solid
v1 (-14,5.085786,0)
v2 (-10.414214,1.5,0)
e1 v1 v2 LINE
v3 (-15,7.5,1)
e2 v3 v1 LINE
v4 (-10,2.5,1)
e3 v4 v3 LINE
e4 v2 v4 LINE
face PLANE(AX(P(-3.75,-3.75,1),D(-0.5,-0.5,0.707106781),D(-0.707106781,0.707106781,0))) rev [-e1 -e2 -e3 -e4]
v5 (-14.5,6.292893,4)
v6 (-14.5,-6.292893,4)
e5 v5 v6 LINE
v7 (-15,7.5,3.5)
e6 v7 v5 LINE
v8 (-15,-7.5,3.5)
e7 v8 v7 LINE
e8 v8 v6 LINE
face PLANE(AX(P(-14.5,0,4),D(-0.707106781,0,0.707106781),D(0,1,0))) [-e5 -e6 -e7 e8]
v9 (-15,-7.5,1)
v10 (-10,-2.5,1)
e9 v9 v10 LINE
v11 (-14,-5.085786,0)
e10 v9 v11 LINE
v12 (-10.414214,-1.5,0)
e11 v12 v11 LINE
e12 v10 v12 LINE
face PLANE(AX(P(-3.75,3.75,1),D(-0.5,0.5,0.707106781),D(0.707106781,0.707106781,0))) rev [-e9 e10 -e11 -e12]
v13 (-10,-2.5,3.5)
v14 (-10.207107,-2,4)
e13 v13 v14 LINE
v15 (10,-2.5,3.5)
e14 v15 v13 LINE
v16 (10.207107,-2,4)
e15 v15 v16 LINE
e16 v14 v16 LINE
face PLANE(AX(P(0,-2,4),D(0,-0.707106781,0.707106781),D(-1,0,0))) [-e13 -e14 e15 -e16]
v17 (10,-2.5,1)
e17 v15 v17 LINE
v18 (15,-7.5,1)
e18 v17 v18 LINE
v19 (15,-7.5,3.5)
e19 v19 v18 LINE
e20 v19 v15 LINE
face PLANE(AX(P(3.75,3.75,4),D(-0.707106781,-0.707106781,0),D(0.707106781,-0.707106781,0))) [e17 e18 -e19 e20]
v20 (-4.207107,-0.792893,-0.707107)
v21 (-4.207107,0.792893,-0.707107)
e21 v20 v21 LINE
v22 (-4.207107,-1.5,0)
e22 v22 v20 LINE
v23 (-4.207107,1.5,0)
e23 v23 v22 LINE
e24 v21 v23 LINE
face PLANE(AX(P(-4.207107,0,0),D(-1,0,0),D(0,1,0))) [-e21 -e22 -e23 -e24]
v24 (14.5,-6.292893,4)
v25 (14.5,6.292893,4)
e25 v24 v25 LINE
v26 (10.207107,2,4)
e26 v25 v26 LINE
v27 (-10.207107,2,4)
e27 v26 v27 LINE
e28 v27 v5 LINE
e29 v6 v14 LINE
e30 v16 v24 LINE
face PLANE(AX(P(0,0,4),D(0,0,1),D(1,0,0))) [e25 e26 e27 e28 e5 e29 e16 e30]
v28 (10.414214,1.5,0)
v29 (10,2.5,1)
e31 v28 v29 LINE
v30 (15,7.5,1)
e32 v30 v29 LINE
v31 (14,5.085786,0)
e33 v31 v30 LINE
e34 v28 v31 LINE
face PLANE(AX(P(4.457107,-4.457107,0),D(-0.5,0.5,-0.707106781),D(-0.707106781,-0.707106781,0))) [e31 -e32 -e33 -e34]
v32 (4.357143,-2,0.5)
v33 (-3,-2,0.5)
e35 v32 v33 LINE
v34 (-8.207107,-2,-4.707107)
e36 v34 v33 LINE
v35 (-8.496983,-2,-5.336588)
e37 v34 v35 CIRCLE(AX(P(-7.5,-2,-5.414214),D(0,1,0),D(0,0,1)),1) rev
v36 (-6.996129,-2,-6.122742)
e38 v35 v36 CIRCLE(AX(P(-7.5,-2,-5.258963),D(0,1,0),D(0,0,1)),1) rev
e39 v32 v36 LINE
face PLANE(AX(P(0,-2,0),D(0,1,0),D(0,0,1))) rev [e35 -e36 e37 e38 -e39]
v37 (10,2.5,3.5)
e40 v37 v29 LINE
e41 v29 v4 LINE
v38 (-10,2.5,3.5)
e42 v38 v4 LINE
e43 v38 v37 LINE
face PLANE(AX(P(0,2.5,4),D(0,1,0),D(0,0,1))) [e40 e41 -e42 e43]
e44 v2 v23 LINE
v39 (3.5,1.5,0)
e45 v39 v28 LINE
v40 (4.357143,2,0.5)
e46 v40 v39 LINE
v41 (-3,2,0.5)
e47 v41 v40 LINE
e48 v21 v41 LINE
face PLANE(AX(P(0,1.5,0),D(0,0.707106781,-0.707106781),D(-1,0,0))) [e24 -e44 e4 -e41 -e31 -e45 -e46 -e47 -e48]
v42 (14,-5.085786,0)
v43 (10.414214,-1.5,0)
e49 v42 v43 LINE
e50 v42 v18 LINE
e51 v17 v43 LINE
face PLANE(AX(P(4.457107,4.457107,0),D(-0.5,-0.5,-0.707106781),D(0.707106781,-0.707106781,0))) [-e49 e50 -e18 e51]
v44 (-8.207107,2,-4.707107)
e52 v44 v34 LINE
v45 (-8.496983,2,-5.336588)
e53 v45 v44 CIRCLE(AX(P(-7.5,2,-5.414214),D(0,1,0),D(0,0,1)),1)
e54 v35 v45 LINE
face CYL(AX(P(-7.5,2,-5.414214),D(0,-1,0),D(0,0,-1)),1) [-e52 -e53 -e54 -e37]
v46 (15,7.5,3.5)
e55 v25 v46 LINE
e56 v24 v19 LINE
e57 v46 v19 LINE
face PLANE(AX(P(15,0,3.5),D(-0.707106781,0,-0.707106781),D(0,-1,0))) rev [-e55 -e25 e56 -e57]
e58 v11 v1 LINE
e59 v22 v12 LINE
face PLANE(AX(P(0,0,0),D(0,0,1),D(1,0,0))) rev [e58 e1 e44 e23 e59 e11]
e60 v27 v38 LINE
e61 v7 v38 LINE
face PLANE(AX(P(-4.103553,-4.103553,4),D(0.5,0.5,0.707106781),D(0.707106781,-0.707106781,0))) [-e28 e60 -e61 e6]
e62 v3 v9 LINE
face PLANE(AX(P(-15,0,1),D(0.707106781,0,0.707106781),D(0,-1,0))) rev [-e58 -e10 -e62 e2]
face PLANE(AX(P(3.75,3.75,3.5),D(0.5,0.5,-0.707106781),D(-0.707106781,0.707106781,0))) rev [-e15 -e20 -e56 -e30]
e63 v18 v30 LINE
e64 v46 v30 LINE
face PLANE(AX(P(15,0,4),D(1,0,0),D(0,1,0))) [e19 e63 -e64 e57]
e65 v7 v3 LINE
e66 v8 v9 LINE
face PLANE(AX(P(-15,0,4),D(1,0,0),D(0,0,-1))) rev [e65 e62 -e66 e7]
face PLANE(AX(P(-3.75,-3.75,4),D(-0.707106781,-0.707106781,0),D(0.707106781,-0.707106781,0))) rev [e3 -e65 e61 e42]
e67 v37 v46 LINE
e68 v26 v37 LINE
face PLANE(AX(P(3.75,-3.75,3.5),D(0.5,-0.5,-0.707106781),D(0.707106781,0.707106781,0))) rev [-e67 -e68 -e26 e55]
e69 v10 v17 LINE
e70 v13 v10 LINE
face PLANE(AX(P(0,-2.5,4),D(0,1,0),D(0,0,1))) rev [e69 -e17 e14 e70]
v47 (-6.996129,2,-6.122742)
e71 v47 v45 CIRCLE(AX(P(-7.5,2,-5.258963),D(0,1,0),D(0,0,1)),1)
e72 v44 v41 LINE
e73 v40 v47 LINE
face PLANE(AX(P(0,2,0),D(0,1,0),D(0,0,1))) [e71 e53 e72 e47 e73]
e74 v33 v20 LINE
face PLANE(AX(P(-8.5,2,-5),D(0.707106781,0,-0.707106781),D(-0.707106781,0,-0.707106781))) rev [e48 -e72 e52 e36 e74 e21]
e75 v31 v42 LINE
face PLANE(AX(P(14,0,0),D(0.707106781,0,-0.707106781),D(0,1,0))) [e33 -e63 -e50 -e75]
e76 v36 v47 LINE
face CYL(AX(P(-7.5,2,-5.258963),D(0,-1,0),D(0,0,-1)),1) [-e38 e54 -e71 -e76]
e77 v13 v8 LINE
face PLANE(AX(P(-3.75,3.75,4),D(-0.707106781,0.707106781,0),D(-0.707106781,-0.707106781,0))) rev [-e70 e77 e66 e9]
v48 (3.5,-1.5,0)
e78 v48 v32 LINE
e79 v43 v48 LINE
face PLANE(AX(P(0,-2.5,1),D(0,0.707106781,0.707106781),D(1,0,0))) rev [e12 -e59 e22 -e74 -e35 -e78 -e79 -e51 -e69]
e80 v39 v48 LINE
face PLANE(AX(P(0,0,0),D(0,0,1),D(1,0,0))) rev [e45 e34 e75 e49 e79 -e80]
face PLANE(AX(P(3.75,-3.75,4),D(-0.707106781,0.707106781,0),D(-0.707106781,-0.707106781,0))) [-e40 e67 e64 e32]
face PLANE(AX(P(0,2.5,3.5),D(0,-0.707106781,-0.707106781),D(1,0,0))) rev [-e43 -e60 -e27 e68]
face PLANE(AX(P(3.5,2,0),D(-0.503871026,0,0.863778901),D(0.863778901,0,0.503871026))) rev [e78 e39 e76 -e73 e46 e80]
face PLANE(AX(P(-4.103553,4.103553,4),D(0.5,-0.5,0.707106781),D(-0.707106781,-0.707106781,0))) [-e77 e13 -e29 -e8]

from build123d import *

# Parameters (mm, degrees)
SKETCH1_W           = 20
SKETCH1_H           = 5
BOSS_EXTRUDE1_DEPTH = 4
BOSS_EXTRUDE2_DEPTH = 2
CHAMFER1_SIZE       = 0.5
CHAMFER2_SIZE       = 1
CHAMFER3_SIZE       = 1
CHAMFER3_SIZE2      = 0.707106781
FILLET5_R           = 1


with BuildPart() as part:
    # Sketch1 → Boss-Extrude1 (new body)
    with BuildSketch(Plane.XY):
        Polygon((-15, 7.5), (-15, -7.5), (-10, -2.5), (-10, 2.5), align=None)
        Rectangle(SKETCH1_W, SKETCH1_H)
        Polygon((10, 2.5), (15, 7.5), (15, -7.5), (10, -2.5), align=None)
    extrude(amount=BOSS_EXTRUDE1_DEPTH)

    # Sketch4 → Boss-Extrude2 (add, symmetric)
    with BuildSketch(Plane(origin=(0, 0, 0), x_dir=(1, 0, 0), z_dir=(0, 1, 0))):
        Polygon((3.5, 0), (-8.5, 7), (-8.5, 5), (-3.5, 0), align=None)
    extrude(amount=BOSS_EXTRUDE2_DEPTH, both=True)

    # Chamfer1
    chamfer1_edges = [part.edges().sort_by_distance(p)[0] for p in [
        (-12.5, -5, 4),
        (0, -2.5, 4),
        (12.5, -5, 4),
        (15, 0, 4),
        (12.5, 5, 4),
        (0, 2.5, 4),
        (-12.5, 5, 4),
        (-15, 0, 4),
    ]]
    chamfer(chamfer1_edges, length=CHAMFER1_SIZE)

    # Chamfer2
    # the kernel refuses this chamfer: 1 mm, written as the material it takes off along each edge
    with BuildSketch(Plane(origin=(16.81845448, -9.31845448, 0), x_dir=(0.7071067811865414, 0.7071067811865538, 0), z_dir=(-0.7071067811865538, 0.7071067811865415, 0))) as chamfer2_piece_1_section:
        Polygon((CHAMFER2_SIZE, 0), (0, -CHAMFER2_SIZE), (0, 0), align=None)
    chamfer2_piece_1 = extrude(amount=12.214433788, mode=Mode.PRIVATE)
    chamfer2_piece_1 = split(chamfer2_piece_1, bisect_by=Plane(origin=(16.81845448, -5.40922724, 3.90922724), z_dir=(0, -0.7071067811865476, -0.7071067811865476)), keep=Keep.TOP, mode=Mode.PRIVATE)
    add(chamfer2_piece_1, mode=Mode.SUBTRACT)
    with BuildSketch(Plane(origin=(15, 10.071682988, 0), x_dir=(-1, 0, 0), z_dir=(0, -1, 0)), Plane(origin=(-15, 10.071682988, 0), x_dir=(0, 0, 1), z_dir=(0, -1, 0))) as chamfer2_piece_2:
        Polygon((CHAMFER2_SIZE, 0), (0, -CHAMFER2_SIZE), (0, 0), align=None)
    extrude(amount=20.143365976, mode=Mode.SUBTRACT)
    with BuildSketch(Plane(origin=(8.18154552, 0.68154552, 0), x_dir=(0.707106781186537, -0.7071067811865581, 0), z_dir=(0.7071067811865581, 0.707106781186537, 0))) as chamfer2_piece_3_section:
        Polygon((CHAMFER2_SIZE, 0), (0, -CHAMFER2_SIZE), (0, 0), align=None)
    chamfer2_piece_3 = extrude(amount=12.214433788, mode=Mode.PRIVATE)
    chamfer2_piece_3 = split(chamfer2_piece_3, bisect_by=Plane(origin=(8.18154552, 1.09077276, -0.40922724), z_dir=(0, 0.7071067811865476, -0.7071067811865476)), keep=Keep.TOP, mode=Mode.PRIVATE)
    add(chamfer2_piece_3, mode=Mode.SUBTRACT)
    with BuildSketch(Plane(origin=(12.571682988, 2.5, 0), x_dir=(0, -1, 0), z_dir=(-1, 0, 0))) as chamfer2_piece_4_section:
        Polygon((CHAMFER2_SIZE, 0), (0, CHAMFER2_SIZE), (0, 0), align=None)
    chamfer2_piece_4 = extrude(amount=25.143365976, mode=Mode.PRIVATE)
    chamfer2_piece_4 = split(chamfer2_piece_4, bisect_by=Plane(origin=(10.268509587, 2.5, 3.948297259), z_dir=(0.5038710255240867, 0, -0.8637789008984332)), keep=Keep.TOP, mode=Mode.PRIVATE)
    chamfer2_piece_4 = split(chamfer2_piece_4, bisect_by=Plane(origin=(12.282315632, 2.789367356, -0.40922724), z_dir=(-0.4999999999999927, 0.5000000000000075, -0.7071067811865475)), keep=Keep.TOP, mode=Mode.PRIVATE)
    add(chamfer2_piece_4, mode=Mode.SUBTRACT)
    with BuildSketch(Plane(origin=(12.571682988, 2.5, 0), x_dir=(0, -1, 0), z_dir=(-1, 0, 0))) as chamfer2_piece_5_section:
        Polygon((CHAMFER2_SIZE, 0), (0, CHAMFER2_SIZE), (0, 0), align=None)
    chamfer2_piece_5 = extrude(amount=25.143365976, mode=Mode.PRIVATE)
    chamfer2_piece_5 = split(chamfer2_piece_5, bisect_by=Plane(origin=(12.571682988, 2, 0), z_dir=(0, 1, 0)), keep=Keep.TOP, mode=Mode.PRIVATE)
    chamfer2_piece_5 = split(chamfer2_piece_5, bisect_by=Plane(origin=(12.282315632, 2.789367356, -0.40922724), z_dir=(-0.4999999999999927, 0.5000000000000075, -0.7071067811865475)), keep=Keep.TOP, mode=Mode.PRIVATE)
    chamfer2_piece_5 = split(chamfer2_piece_5, bisect_by=Plane(origin=(6.57520885, -3.496474138, 8.480295052), z_dir=(0.49999999999999395, 0.500000000000006, -0.7071067811865475)), keep=Keep.TOP, mode=Mode.PRIVATE)
    add(chamfer2_piece_5, mode=Mode.SUBTRACT)
    with BuildSketch(Plane(origin=(12.571682988, 2.5, 0), x_dir=(0, -1, 0), z_dir=(-1, 0, 0))) as chamfer2_piece_6_section:
        Polygon((CHAMFER2_SIZE, 0), (0, CHAMFER2_SIZE), (0, 0), align=None)
    chamfer2_piece_6 = extrude(amount=25.143365976, mode=Mode.PRIVATE)
    chamfer2_piece_6 = split(chamfer2_piece_6, bisect_by=Plane(origin=(4.535841494, 2.5, 8.035841494), z_dir=(-0.7071067811865487, 0, 0.7071067811865464)), keep=Keep.TOP, mode=Mode.PRIVATE)
    chamfer2_piece_6 = split(chamfer2_piece_6, bisect_by=Plane(origin=(6.57520885, -3.496474138, 8.480295052), z_dir=(0.49999999999999395, 0.500000000000006, -0.7071067811865475)), keep=Keep.TOP, mode=Mode.PRIVATE)
    add(chamfer2_piece_6, mode=Mode.SUBTRACT)
    with BuildSketch(Plane(origin=(-12.571682988, -2.5, 0), x_dir=(0, 1, 0), z_dir=(1, 0, 0))) as chamfer2_piece_7_section:
        Polygon((CHAMFER2_SIZE, 0), (0, CHAMFER2_SIZE), (0, 0), align=None)
    chamfer2_piece_7 = extrude(amount=25.143365976, mode=Mode.PRIVATE)
    chamfer2_piece_7 = split(chamfer2_piece_7, bisect_by=Plane(origin=(-8.035841494, -2.5, -4.535841494), z_dir=(-0.7071067811865487, 0, 0.7071067811865464)), keep=Keep.TOP, mode=Mode.PRIVATE)
    chamfer2_piece_7 = split(chamfer2_piece_7, bisect_by=Plane(origin=(-12.282315632, -2.789367356, -0.40922724), z_dir=(0.499999999999994, -0.5000000000000063, -0.7071067811865475)), keep=Keep.TOP, mode=Mode.PRIVATE)
    add(chamfer2_piece_7, mode=Mode.SUBTRACT)
    with BuildSketch(Plane(origin=(-12.571682988, -2.5, 0), x_dir=(0, 1, 0), z_dir=(1, 0, 0))) as chamfer2_piece_8_section:
        Polygon((CHAMFER2_SIZE, 0), (0, CHAMFER2_SIZE), (0, 0), align=None)
    chamfer2_piece_8 = extrude(amount=25.143365976, mode=Mode.PRIVATE)
    chamfer2_piece_8 = split(chamfer2_piece_8, bisect_by=Plane(origin=(-12.571682988, -2, 0), z_dir=(0, -1, 0)), keep=Keep.TOP, mode=Mode.PRIVATE)
    chamfer2_piece_8 = split(chamfer2_piece_8, bisect_by=Plane(origin=(-12.282315632, -2.789367356, -0.40922724), z_dir=(0.499999999999994, -0.5000000000000063, -0.7071067811865475)), keep=Keep.TOP, mode=Mode.PRIVATE)
    chamfer2_piece_8 = split(chamfer2_piece_8, bisect_by=Plane(origin=(-6.57520885, 3.496474138, 8.480295052), z_dir=(-0.49999999999999584, -0.5000000000000047, -0.7071067811865475)), keep=Keep.TOP, mode=Mode.PRIVATE)
    add(chamfer2_piece_8, mode=Mode.SUBTRACT)
    with BuildSketch(Plane(origin=(-12.571682988, -2.5, 0), x_dir=(0, 1, 0), z_dir=(1, 0, 0))) as chamfer2_piece_9_section:
        Polygon((CHAMFER2_SIZE, 0), (0, CHAMFER2_SIZE), (0, 0), align=None)
    chamfer2_piece_9 = extrude(amount=25.143365976, mode=Mode.PRIVATE)
    chamfer2_piece_9 = split(chamfer2_piece_9, bisect_by=Plane(origin=(-8.491307514, -2.5, -6.994929383), z_dir=(0.5038710255240867, 0, -0.8637789008984332)), keep=Keep.TOP, mode=Mode.PRIVATE)
    chamfer2_piece_9 = split(chamfer2_piece_9, bisect_by=Plane(origin=(-6.57520885, 3.496474138, 8.480295052), z_dir=(-0.49999999999999584, -0.5000000000000047, -0.7071067811865475)), keep=Keep.TOP, mode=Mode.PRIVATE)
    add(chamfer2_piece_9, mode=Mode.SUBTRACT)
    with BuildSketch(Plane(origin=(-16.81845448, -9.31845448, 0), x_dir=(-0.7071067811865389, 0.7071067811865562, 0), z_dir=(0.7071067811865562, 0.7071067811865389, 0))) as chamfer2_piece_10_section:
        Polygon((CHAMFER2_SIZE, 0), (0, CHAMFER2_SIZE), (0, 0), align=None)
    chamfer2_piece_10 = extrude(amount=12.214433788, mode=Mode.PRIVATE)
    chamfer2_piece_10 = split(chamfer2_piece_10, bisect_by=Plane(origin=(-16.81845448, -5.40922724, 3.90922724), z_dir=(0, -0.7071067811865476, -0.7071067811865476)), keep=Keep.TOP, mode=Mode.PRIVATE)
    add(chamfer2_piece_10, mode=Mode.SUBTRACT)
    with BuildSketch(Plane(origin=(-8.18154552, 0.68154552, 0), x_dir=(0, 0, 1), z_dir=(-0.707106781186556, 0.707106781186539, 0))) as chamfer2_piece_11_section:
        Polygon((CHAMFER2_SIZE, 0), (0, -CHAMFER2_SIZE), (0, 0), align=None)
    chamfer2_piece_11 = extrude(amount=12.214433788, mode=Mode.PRIVATE)
    chamfer2_piece_11 = split(chamfer2_piece_11, bisect_by=Plane(origin=(-8.18154552, 1.09077276, -0.40922724), z_dir=(0, 0.7071067811865476, -0.7071067811865476)), keep=Keep.TOP, mode=Mode.PRIVATE)
    add(chamfer2_piece_11, mode=Mode.SUBTRACT)

    # Chamfer3
    chamfer3_edges = [part.edges().sort_by_distance(p)[0] for p in [
        (-3.5, 0, 0),
    ]]
    chamfer3_side = [part.faces().sort_by_distance(p)[0] for p in [
        (-5.967078189, 0, -2.467078189),
    ]]
    chamfer(chamfer3_edges, length=CHAMFER3_SIZE, length2=CHAMFER3_SIZE2, reference=chamfer3_side[0])

    # Fillet5
    # the kernel refuses this fillet: 1 mm, written as the material it takes off along each edge
    with BuildSketch(Plane(origin=(-8.5, -6.352592498, -7), x_dir=(0, 0, 1), z_dir=(0, 1, 0))) as fillet5_piece_1:
        with BuildLine():
            CenterArc((FILLET5_R * 1.74103699912, FILLET5_R), FILLET5_R, 149.743562836, 120.256437164)
            Line((FILLET5_R * 0.877258098223, FILLET5_R * 1.50387102552), (0, 0))
            Line((0, 0), (FILLET5_R * 1.74103699912, 0))
        make_face()
    extrude(amount=12.705184996, mode=Mode.SUBTRACT)
    with BuildSketch(Plane(origin=(-8.5, -3.035533906, -5), x_dir=(0, 0, -1), z_dir=(0, 1, 0))) as fillet5_piece_2:
        with BuildLine():
            CenterArc((FILLET5_R * 0.414213562373, -FILLET5_R), FILLET5_R, 90, 45)
            Line((-FILLET5_R * 0.292893218813, -FILLET5_R * 0.292893218813), (0, 0))
            Line((0, 0), (FILLET5_R * 0.414213562373, 0))
        make_face()
    extrude(amount=6.071067812, mode=Mode.SUBTRACT)


solid = part.part
